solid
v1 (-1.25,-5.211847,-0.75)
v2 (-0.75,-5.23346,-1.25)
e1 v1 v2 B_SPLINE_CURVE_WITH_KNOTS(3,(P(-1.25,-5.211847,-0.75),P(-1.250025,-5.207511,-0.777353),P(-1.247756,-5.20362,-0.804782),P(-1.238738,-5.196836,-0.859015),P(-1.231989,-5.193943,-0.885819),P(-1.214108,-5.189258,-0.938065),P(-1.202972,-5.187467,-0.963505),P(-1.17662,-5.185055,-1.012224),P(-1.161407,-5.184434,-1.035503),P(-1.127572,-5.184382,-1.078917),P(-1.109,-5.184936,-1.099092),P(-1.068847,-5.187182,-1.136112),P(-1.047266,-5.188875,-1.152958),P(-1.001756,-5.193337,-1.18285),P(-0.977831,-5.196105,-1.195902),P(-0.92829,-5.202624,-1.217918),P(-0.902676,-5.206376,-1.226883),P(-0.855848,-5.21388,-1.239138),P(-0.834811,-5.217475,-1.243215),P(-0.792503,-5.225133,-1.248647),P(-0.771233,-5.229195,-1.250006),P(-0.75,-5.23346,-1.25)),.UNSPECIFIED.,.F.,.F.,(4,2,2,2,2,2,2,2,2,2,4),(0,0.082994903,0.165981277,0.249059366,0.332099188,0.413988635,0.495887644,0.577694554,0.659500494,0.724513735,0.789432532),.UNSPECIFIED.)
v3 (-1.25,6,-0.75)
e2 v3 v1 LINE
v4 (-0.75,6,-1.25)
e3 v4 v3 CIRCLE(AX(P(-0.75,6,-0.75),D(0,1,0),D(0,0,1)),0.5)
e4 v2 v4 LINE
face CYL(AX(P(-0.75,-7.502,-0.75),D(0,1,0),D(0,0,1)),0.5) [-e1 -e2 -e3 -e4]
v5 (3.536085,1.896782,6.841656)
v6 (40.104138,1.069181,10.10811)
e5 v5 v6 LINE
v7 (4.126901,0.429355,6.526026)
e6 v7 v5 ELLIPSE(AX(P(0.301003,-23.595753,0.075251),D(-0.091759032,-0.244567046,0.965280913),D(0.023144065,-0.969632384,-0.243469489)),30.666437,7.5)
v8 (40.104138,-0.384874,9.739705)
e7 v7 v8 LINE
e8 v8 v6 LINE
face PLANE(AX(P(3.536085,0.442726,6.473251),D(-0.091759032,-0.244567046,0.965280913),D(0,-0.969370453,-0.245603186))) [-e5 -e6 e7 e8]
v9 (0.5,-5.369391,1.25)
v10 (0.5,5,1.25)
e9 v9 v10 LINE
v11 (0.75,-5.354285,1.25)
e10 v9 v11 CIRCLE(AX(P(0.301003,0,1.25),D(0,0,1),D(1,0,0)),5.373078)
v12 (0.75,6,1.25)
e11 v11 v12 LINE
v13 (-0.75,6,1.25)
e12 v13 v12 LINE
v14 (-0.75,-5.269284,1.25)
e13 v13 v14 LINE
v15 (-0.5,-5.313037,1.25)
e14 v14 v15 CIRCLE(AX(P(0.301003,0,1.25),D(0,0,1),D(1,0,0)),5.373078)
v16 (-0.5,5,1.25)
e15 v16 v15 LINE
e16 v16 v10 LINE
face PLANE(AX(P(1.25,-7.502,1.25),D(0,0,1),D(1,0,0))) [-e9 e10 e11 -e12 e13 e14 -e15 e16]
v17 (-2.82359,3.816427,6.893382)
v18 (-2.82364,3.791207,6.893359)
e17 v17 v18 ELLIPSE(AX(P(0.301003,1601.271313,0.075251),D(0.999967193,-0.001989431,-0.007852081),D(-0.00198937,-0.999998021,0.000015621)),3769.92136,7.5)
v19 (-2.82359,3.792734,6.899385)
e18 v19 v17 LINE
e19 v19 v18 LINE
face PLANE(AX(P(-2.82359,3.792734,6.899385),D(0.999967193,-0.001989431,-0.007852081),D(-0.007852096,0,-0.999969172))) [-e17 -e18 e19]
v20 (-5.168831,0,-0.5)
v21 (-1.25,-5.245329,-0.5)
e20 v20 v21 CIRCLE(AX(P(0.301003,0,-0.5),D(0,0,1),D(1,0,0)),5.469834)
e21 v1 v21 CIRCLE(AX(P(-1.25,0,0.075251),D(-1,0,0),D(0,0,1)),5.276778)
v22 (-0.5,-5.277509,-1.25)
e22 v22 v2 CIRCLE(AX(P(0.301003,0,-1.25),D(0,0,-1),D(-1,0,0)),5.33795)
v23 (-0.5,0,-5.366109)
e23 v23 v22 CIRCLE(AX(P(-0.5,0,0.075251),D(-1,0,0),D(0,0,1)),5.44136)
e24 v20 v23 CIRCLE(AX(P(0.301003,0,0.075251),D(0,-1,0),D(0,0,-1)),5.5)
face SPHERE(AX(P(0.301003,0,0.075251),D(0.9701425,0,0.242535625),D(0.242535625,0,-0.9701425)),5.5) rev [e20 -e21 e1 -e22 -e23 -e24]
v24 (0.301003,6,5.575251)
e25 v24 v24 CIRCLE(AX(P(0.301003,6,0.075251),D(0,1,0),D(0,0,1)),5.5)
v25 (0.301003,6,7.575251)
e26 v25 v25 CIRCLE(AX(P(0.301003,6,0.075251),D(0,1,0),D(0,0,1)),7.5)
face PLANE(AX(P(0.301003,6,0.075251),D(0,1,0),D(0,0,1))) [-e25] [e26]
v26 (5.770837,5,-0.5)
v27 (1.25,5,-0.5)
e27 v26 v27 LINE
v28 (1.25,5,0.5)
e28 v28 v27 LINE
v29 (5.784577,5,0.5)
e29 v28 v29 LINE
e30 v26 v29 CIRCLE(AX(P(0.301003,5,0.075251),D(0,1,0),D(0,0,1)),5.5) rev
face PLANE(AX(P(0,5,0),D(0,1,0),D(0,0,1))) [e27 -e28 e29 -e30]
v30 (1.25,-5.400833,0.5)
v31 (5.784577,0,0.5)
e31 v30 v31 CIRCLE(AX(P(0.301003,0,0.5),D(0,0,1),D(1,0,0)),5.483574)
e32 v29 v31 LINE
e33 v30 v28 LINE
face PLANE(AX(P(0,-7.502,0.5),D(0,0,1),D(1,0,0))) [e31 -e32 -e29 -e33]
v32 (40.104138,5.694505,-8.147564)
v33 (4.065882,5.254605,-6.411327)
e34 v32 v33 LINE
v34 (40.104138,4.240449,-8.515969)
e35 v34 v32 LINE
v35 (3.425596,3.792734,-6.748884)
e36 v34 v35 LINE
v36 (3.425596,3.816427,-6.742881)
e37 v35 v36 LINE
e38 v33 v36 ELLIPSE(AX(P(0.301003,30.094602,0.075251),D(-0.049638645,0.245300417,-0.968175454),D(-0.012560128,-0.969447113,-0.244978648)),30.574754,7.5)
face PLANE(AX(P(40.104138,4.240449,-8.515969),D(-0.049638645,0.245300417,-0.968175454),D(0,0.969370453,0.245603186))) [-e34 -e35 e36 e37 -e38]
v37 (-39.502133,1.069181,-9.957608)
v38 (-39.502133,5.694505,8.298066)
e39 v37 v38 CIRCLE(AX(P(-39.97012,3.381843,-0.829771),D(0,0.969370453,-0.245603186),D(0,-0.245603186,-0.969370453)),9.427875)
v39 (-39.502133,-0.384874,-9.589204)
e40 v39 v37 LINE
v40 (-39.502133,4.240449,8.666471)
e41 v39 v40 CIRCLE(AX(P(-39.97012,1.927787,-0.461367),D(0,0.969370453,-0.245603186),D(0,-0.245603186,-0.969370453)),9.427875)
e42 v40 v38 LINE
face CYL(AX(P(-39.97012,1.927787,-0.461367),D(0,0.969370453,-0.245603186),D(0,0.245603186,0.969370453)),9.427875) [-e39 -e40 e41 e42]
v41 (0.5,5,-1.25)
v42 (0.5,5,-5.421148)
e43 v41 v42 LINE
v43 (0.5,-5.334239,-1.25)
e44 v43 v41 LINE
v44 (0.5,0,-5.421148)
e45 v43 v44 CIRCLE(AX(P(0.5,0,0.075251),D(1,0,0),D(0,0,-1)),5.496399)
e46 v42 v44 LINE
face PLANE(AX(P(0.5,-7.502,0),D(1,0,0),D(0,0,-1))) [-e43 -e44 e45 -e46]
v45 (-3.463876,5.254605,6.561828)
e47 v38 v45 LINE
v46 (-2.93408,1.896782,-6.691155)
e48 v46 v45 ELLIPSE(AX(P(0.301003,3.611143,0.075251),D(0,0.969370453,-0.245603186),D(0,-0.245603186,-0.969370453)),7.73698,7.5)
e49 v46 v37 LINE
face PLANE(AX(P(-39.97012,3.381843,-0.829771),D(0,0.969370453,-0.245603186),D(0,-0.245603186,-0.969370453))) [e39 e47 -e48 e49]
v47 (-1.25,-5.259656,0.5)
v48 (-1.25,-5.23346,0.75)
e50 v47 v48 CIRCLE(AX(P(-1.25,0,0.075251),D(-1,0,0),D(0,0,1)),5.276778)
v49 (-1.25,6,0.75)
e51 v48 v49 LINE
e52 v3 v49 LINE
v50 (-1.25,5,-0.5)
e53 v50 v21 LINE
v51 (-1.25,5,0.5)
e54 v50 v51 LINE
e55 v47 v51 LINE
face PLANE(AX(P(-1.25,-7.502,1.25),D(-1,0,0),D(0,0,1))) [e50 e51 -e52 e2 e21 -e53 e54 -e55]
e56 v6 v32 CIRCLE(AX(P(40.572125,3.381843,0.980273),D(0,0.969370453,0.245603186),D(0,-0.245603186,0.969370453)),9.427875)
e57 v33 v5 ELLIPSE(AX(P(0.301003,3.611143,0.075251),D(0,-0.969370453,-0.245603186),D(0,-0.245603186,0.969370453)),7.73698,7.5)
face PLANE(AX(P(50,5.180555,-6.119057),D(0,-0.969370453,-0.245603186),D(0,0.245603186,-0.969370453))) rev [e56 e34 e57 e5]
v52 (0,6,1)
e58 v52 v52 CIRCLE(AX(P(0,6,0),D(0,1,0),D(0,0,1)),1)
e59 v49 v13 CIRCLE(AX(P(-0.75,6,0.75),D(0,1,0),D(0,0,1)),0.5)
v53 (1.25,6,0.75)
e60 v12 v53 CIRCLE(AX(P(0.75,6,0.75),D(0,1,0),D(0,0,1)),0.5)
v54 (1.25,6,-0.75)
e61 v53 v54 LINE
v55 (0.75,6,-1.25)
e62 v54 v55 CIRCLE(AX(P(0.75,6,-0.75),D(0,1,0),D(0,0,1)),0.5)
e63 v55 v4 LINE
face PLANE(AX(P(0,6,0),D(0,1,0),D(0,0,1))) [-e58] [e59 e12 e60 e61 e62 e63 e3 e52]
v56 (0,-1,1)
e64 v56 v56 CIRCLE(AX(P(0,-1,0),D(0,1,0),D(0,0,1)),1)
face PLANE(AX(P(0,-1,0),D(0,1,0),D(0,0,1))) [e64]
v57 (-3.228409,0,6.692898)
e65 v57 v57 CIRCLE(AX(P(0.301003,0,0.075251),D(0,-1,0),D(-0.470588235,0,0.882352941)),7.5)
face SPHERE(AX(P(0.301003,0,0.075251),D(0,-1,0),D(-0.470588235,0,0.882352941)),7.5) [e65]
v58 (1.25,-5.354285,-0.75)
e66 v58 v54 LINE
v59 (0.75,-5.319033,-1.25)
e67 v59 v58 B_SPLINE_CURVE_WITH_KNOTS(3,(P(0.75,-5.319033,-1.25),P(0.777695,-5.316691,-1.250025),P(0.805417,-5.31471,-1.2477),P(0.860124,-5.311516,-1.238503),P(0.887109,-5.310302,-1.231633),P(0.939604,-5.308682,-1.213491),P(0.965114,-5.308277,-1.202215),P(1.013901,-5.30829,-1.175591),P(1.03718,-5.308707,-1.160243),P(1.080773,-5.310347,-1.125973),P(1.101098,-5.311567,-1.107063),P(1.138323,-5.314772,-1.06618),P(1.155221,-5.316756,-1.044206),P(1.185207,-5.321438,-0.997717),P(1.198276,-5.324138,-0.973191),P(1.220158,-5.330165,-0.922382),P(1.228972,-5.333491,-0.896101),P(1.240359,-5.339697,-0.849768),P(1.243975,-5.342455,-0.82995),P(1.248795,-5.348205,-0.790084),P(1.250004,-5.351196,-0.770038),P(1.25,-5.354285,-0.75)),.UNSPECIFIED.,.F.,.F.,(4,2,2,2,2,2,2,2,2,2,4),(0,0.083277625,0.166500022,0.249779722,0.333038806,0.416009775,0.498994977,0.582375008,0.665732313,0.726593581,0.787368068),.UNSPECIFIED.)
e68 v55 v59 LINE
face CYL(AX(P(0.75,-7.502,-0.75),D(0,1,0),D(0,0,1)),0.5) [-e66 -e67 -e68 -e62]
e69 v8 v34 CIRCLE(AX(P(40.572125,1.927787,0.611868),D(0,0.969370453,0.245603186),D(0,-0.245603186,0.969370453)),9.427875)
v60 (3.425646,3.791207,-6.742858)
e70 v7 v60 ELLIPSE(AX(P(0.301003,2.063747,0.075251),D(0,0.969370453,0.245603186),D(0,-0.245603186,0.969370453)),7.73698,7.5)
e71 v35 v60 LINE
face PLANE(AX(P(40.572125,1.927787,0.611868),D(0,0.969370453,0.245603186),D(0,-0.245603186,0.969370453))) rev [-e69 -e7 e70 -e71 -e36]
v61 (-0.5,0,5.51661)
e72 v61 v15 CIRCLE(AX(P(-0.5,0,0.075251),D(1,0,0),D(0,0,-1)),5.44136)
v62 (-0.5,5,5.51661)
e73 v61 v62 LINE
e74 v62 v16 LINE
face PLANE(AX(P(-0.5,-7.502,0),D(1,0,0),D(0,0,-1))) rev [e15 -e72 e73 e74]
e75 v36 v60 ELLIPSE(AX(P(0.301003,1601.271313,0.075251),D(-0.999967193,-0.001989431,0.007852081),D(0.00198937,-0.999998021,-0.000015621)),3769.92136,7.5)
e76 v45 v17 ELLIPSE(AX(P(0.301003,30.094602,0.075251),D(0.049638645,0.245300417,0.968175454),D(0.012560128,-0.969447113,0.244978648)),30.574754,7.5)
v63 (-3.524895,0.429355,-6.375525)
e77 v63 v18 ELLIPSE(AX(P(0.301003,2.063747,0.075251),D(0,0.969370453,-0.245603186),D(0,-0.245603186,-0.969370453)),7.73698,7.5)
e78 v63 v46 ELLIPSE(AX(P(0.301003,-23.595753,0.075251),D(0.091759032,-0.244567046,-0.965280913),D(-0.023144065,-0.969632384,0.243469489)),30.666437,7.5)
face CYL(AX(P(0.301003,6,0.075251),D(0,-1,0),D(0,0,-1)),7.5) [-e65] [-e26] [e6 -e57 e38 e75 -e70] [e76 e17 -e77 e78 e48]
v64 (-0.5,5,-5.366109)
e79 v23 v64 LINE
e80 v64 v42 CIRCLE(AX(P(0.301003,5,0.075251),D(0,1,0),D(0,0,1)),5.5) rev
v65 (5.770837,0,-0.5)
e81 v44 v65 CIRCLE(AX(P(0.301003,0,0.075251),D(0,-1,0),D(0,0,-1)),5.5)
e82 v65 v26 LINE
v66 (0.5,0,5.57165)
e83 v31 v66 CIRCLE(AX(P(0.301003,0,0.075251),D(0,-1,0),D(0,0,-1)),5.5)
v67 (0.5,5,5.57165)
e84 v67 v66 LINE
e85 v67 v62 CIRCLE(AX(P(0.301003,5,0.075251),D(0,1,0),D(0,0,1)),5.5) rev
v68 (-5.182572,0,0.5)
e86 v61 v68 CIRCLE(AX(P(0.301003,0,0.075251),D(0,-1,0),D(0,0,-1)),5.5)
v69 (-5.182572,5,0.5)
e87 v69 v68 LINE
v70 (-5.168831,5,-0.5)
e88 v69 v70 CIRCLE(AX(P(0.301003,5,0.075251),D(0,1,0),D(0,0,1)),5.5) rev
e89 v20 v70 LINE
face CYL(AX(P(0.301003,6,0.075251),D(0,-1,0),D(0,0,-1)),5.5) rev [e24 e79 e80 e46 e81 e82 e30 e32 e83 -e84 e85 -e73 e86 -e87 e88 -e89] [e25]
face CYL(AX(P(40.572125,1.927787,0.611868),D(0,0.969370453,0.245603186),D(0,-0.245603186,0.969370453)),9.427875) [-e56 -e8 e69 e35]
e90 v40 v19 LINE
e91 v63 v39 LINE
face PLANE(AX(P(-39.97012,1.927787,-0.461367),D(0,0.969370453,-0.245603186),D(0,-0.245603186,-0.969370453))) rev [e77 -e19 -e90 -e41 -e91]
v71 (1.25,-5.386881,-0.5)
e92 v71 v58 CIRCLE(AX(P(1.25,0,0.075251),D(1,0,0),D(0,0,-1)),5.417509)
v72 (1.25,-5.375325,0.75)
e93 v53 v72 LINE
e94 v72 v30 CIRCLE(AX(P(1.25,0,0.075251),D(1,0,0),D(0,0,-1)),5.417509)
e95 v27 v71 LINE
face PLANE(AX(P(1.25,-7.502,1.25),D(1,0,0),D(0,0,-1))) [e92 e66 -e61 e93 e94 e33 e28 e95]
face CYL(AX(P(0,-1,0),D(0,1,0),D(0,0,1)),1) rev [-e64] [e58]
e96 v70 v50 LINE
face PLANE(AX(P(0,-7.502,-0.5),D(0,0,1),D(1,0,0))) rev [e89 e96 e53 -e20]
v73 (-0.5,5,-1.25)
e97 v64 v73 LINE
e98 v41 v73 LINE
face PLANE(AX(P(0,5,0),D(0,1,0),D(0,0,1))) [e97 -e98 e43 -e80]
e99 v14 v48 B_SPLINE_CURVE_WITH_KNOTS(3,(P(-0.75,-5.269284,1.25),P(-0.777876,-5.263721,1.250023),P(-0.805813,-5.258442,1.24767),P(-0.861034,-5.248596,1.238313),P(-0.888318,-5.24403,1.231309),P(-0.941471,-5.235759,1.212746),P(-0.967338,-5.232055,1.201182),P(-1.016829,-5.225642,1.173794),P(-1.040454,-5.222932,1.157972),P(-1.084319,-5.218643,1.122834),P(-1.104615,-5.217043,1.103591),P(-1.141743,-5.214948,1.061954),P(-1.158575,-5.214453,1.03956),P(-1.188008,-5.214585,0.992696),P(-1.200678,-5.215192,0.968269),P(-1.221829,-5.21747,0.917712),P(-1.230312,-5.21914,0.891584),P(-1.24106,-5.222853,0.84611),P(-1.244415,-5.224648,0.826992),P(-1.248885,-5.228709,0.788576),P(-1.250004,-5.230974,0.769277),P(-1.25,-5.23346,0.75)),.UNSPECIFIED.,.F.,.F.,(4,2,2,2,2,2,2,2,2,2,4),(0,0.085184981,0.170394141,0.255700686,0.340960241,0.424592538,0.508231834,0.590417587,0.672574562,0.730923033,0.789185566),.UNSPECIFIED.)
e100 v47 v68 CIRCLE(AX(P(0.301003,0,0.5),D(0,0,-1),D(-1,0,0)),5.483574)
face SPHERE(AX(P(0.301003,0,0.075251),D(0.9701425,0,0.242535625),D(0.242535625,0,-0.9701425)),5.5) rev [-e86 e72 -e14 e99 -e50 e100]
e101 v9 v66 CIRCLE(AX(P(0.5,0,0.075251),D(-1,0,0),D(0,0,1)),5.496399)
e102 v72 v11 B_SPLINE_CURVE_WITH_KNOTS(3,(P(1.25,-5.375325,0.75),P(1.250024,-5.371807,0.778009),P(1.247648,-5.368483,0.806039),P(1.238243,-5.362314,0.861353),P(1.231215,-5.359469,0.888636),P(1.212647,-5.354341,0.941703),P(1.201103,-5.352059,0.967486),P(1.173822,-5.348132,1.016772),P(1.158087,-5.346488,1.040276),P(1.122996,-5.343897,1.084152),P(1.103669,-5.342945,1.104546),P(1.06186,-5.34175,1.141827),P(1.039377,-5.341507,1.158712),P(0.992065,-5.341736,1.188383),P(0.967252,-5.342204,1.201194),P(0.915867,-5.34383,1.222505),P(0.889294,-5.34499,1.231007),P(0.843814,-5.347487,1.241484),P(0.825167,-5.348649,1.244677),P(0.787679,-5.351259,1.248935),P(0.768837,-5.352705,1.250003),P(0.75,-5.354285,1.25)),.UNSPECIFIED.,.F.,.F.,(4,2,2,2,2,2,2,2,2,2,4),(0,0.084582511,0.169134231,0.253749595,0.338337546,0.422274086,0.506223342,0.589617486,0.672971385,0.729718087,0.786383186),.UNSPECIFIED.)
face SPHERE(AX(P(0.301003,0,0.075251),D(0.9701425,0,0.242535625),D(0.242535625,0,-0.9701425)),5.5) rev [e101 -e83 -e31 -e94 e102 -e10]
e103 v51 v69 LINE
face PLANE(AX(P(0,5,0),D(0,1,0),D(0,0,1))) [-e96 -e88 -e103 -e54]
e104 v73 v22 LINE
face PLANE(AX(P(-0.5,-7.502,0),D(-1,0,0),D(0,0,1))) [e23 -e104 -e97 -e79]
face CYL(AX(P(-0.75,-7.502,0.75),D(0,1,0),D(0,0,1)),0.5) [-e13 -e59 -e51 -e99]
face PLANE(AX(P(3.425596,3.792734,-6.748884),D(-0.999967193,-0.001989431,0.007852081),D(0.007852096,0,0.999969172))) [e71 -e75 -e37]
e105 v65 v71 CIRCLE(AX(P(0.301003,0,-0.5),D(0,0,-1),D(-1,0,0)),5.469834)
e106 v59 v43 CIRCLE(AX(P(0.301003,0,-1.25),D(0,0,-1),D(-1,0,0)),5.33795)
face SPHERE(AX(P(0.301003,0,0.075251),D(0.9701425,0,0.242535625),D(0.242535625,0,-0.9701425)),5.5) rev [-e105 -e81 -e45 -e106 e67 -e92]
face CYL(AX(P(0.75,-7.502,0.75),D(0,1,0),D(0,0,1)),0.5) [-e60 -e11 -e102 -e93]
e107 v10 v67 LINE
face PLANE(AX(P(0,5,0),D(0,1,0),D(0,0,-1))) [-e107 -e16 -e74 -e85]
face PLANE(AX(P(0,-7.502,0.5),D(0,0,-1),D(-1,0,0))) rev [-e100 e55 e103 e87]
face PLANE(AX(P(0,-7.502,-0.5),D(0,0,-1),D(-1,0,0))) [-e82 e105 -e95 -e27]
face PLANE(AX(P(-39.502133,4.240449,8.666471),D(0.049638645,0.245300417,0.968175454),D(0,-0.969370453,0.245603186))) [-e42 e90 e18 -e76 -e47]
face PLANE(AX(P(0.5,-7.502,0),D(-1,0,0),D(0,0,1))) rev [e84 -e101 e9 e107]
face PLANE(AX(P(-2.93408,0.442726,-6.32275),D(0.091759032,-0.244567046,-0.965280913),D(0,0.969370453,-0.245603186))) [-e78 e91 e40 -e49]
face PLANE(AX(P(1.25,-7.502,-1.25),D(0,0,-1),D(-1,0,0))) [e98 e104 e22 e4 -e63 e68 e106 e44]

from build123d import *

# Parameters (mm, degrees)
SKETCH_1_R               = 7.5
EXTRUDE_1_DEPTH          = 6
EXTRUDE_2_DEPTH          = 50
EXTRUDE_3_DEPTH          = 1.5
CUT_EXTRUDE_START        = -1.5
CUT_EXTRUDE_2_DEPTH      = 1.475557967
PATTERN_CIRCULAR_1_COUNT = 2
REVOLVE_1_ANGLE          = 180
EXTRUDE_5_REACH          = 54.77
SKETCH_8_W               = 2.5
SKETCH_8_H               = 2.5
EXTRUDE_6_REACH          = 55.77
EXTRUDE_START            = -1
SKETCH_14_W              = 6.185620564
SKETCH_14_H              = 1
EXTRUDE_7_REACH          = 54.523
SKETCH_15_W              = 1
SKETCH_15_H              = 5.873847005
FILLET_1_R               = 0.5
SKETCH_16_R              = 1
CUT_EXTRUDE_5_DEPTH      = 7


# Read off the part's stored shape, not the designer's step: 切除-拉伸2, 抽壳9
with BuildPart() as part:
    # 草图1 → 凸台-拉伸1 (new body)
    with BuildSketch(Plane(origin=(0, 0, 0), x_dir=(1, 0, 0), z_dir=(0, 1, 0))):
        with Locations(Location((0.301002806, -0.075250701, 0), (0, 0, 270))):
            Circle(SKETCH_1_R)
    extrude(amount=EXTRUDE_1_DEPTH)

    # 草图2 → 凸台-拉伸2 (add)
    with BuildSketch(Plane(origin=(0, 0, 0), x_dir=(0, 0, -1), z_dir=(1, 0, 0))):
        Polygon((-6.841656071, 1.896781733), (-6.217832024, 0.532654335), (6.742880936, 3.816427212), (6.11905689, 5.18055461), align=None)
    extrude(amount=EXTRUDE_2_DEPTH)

    # 草图3 → 凸台-拉伸3 (add)
    with BuildSketch(Plane(origin=(0, 3.411230811, 0.864281714), x_dir=(1, 0, 0), z_dir=(0, 0.9693704528417939, 0.24560318637447578))):
        with BuildLine():
            Line((3.425595735, 7.47367623), (3.536085243, -6.166243606))
            Line((3.536085243, -6.166243606), (40.104138222, -9.535908549))
            ThreePointArc((40.104138222, -9.535908549), (50, -0.119655983), (40.104138222, 9.296596584))
            Line((40.104138222, 9.296596584), (3.425595735, 7.47367623))
        make_face()
    extrude_3 = extrude(amount=-EXTRUDE_3_DEPTH)

    # 切除-拉伸2 outline → 切除-拉伸2 (cut)
    with BuildSketch(Plane(origin=(0, 1.957175132, 0.495876935), x_dir=(1, 0, 0), z_dir=(0, -0.9693704528417938, -0.24560318637447576)).offset(CUT_EXTRUDE_START)):
        with BuildLine():
            Line((59.770521771, 9.535908549), (41.04011208, 9.535908549))
            ThreePointArc((41.04011208, 9.535908549), (47.402093905, 6.618605973), (50, 0.119655983))
            ThreePointArc((50, 0.119655983), (47.402093905, -6.379294008), (41.040112081, -9.296596584))
            Line((41.040112081, -9.296596584), (60.303287448, -9.296596584))
            Line((60.303287448, -9.296596584), (59.770521771, 9.535908549))
        make_face()
    extrude(amount=CUT_EXTRUDE_2_DEPTH, mode=Mode.SUBTRACT)

    # 阵列(圆周)1: 凸台-拉伸3 ×2 about axis
    pattern_circular_1_axis = Axis((0.301002806, 0, 0.075250701), (0, 1, 0))
    for i in range(1, PATTERN_CIRCULAR_1_COUNT):
        add(extrude_3.rotate(pattern_circular_1_axis, i * 360 / PATTERN_CIRCULAR_1_COUNT))

    # 草图6 → 旋转1 (revolve)
    with BuildSketch(Plane(origin=(0, 0, 0), x_dir=(1, 0, 0), z_dir=(0, 1, 0))):
        with BuildLine():
            Line((7.577071557, -1.894267889), (-6.975065945, 1.743766486))
            ThreePointArc((-6.975065945, 1.743766486), (2.120019994, 7.20081805), (7.577071557, -1.894267889))
        make_face()
    revolve(axis=Axis((7.577071557, 0, 1.894267889), (-0.9701425001453376, 0, -0.2425356250363098)), revolution_arc=REVOLVE_1_ANGLE)

    # 抽壳9 outline → 抽壳9 (revolve, cut)
    with BuildSketch(Plane(origin=(0.301002806, 0, 0.075250701), x_dir=(1, 0, 0), z_dir=(0, 0, 1))):
        with BuildLine():
            Line((5.5, 6e-09), (5.5, 6))
            Line((5.5, 6), (0, 6))
            Line((0, 6), (0, -5.5))
            ThreePointArc((0, -5.5), (3.889087299, -3.889087294), (5.5, 6e-09))
        make_face()
    revolve(axis=Axis((0.301002806, 0, 0.075250701), (0, 1, 0)), mode=Mode.SUBTRACT)

    # 草图8 → 凸台-拉伸5 (add, up to next)
    with BuildSketch(Plane(origin=(0, 6, 0), x_dir=(1, 0, 0), z_dir=(0, 1, 0)), mode=Mode.PRIVATE) as extrude_5_sk1:
        Rectangle(SKETCH_8_W, SKETCH_8_H)
    extrude_5_tool1 = extrude(extrude_5_sk1.sketch, amount=-EXTRUDE_5_REACH, mode=Mode.PRIVATE) - part.part
    add(extrude_5_tool1.solids().sort_by_distance((0, 6, 0))[0])

    # 草图14 → 凸台-拉伸6 (add, up to next)
    with BuildSketch(Plane(origin=(0, 6, 0), x_dir=(1, 0, 0), z_dir=(0, 1, 0)).offset(EXTRUDE_START), mode=Mode.PRIVATE) as extrude_6_sk1:
        with Locations((3.092810282, 0)):
            Rectangle(SKETCH_14_W, SKETCH_14_H)
    extrude_6_tool1 = extrude(extrude_6_sk1.sketch, amount=-EXTRUDE_6_REACH, mode=Mode.PRIVATE) - part.part
    extrude_6 = extrude_6_tool1.solids().sort_by_distance((3.09281, 5, 0))[0]
    add(extrude_6)

    # 镜向1: 凸台-拉伸6 across plane
    add(extrude_6.mirror(Plane(origin=(0, 0, 0), x_dir=(0, 0, 1), z_dir=(1, 0, 0))))

    # 草图15 → 凸台-拉伸7 (add, up to next)
    with BuildSketch(Plane(origin=(0, 5, 0), x_dir=(1, 0, 0), z_dir=(0, 1, 0)), mode=Mode.PRIVATE) as extrude_7_sk1:
        with Locations((0, 2.936923503)):
            Rectangle(SKETCH_15_W, SKETCH_15_H)
    extrude_7_tool1 = extrude(extrude_7_sk1.sketch, amount=-EXTRUDE_7_REACH, mode=Mode.PRIVATE) - part.part
    extrude_7 = extrude_7_tool1.solids().sort_by_distance((0, 5, -2.936924))[0]
    add(extrude_7)

    # 镜向2: 凸台-拉伸7 mirrored; each copy of 凸台-拉伸7 runs up to whatever stops it at its own place
    mirror_2_before = part.part  # the part as the pattern finds it: every copy runs up to it
    mirror_2_extrude_7_long = extrude(extrude_7_sk1.sketch, amount=-EXTRUDE_7_REACH, mode=Mode.PRIVATE)
    mirror_2_extrude_7_tool1 = mirror_2_extrude_7_long.mirror(Plane.XY) - mirror_2_before
    add(mirror_2_extrude_7_tool1.solids().sort_by_distance((0, 5, 2.936924))[0])

    # 圆角1
    fillet_1_edges = [part.edges().sort_by_distance(p)[0] for p in [
        (-1.25, 0.427824152, 1.25),
        (1.25, 0.355696292, 1.25),
        (1.25, 0.373542552, -1.25),
        (-1.25, 0.446174395, -1.25),
    ]]
    fillet(fillet_1_edges, radius=FILLET_1_R)

    # 草图16 → 切除-拉伸5 (cut)
    with BuildSketch(Plane(origin=(0, 6, 0), x_dir=(1, 0, 0), z_dir=(0, 1, 0))):
        with Locations(Location((0, 0, 0), (0, 0, 270))):
            Circle(SKETCH_16_R)
    extrude(amount=-CUT_EXTRUDE_5_DEPTH, mode=Mode.SUBTRACT)


solid = part.part
